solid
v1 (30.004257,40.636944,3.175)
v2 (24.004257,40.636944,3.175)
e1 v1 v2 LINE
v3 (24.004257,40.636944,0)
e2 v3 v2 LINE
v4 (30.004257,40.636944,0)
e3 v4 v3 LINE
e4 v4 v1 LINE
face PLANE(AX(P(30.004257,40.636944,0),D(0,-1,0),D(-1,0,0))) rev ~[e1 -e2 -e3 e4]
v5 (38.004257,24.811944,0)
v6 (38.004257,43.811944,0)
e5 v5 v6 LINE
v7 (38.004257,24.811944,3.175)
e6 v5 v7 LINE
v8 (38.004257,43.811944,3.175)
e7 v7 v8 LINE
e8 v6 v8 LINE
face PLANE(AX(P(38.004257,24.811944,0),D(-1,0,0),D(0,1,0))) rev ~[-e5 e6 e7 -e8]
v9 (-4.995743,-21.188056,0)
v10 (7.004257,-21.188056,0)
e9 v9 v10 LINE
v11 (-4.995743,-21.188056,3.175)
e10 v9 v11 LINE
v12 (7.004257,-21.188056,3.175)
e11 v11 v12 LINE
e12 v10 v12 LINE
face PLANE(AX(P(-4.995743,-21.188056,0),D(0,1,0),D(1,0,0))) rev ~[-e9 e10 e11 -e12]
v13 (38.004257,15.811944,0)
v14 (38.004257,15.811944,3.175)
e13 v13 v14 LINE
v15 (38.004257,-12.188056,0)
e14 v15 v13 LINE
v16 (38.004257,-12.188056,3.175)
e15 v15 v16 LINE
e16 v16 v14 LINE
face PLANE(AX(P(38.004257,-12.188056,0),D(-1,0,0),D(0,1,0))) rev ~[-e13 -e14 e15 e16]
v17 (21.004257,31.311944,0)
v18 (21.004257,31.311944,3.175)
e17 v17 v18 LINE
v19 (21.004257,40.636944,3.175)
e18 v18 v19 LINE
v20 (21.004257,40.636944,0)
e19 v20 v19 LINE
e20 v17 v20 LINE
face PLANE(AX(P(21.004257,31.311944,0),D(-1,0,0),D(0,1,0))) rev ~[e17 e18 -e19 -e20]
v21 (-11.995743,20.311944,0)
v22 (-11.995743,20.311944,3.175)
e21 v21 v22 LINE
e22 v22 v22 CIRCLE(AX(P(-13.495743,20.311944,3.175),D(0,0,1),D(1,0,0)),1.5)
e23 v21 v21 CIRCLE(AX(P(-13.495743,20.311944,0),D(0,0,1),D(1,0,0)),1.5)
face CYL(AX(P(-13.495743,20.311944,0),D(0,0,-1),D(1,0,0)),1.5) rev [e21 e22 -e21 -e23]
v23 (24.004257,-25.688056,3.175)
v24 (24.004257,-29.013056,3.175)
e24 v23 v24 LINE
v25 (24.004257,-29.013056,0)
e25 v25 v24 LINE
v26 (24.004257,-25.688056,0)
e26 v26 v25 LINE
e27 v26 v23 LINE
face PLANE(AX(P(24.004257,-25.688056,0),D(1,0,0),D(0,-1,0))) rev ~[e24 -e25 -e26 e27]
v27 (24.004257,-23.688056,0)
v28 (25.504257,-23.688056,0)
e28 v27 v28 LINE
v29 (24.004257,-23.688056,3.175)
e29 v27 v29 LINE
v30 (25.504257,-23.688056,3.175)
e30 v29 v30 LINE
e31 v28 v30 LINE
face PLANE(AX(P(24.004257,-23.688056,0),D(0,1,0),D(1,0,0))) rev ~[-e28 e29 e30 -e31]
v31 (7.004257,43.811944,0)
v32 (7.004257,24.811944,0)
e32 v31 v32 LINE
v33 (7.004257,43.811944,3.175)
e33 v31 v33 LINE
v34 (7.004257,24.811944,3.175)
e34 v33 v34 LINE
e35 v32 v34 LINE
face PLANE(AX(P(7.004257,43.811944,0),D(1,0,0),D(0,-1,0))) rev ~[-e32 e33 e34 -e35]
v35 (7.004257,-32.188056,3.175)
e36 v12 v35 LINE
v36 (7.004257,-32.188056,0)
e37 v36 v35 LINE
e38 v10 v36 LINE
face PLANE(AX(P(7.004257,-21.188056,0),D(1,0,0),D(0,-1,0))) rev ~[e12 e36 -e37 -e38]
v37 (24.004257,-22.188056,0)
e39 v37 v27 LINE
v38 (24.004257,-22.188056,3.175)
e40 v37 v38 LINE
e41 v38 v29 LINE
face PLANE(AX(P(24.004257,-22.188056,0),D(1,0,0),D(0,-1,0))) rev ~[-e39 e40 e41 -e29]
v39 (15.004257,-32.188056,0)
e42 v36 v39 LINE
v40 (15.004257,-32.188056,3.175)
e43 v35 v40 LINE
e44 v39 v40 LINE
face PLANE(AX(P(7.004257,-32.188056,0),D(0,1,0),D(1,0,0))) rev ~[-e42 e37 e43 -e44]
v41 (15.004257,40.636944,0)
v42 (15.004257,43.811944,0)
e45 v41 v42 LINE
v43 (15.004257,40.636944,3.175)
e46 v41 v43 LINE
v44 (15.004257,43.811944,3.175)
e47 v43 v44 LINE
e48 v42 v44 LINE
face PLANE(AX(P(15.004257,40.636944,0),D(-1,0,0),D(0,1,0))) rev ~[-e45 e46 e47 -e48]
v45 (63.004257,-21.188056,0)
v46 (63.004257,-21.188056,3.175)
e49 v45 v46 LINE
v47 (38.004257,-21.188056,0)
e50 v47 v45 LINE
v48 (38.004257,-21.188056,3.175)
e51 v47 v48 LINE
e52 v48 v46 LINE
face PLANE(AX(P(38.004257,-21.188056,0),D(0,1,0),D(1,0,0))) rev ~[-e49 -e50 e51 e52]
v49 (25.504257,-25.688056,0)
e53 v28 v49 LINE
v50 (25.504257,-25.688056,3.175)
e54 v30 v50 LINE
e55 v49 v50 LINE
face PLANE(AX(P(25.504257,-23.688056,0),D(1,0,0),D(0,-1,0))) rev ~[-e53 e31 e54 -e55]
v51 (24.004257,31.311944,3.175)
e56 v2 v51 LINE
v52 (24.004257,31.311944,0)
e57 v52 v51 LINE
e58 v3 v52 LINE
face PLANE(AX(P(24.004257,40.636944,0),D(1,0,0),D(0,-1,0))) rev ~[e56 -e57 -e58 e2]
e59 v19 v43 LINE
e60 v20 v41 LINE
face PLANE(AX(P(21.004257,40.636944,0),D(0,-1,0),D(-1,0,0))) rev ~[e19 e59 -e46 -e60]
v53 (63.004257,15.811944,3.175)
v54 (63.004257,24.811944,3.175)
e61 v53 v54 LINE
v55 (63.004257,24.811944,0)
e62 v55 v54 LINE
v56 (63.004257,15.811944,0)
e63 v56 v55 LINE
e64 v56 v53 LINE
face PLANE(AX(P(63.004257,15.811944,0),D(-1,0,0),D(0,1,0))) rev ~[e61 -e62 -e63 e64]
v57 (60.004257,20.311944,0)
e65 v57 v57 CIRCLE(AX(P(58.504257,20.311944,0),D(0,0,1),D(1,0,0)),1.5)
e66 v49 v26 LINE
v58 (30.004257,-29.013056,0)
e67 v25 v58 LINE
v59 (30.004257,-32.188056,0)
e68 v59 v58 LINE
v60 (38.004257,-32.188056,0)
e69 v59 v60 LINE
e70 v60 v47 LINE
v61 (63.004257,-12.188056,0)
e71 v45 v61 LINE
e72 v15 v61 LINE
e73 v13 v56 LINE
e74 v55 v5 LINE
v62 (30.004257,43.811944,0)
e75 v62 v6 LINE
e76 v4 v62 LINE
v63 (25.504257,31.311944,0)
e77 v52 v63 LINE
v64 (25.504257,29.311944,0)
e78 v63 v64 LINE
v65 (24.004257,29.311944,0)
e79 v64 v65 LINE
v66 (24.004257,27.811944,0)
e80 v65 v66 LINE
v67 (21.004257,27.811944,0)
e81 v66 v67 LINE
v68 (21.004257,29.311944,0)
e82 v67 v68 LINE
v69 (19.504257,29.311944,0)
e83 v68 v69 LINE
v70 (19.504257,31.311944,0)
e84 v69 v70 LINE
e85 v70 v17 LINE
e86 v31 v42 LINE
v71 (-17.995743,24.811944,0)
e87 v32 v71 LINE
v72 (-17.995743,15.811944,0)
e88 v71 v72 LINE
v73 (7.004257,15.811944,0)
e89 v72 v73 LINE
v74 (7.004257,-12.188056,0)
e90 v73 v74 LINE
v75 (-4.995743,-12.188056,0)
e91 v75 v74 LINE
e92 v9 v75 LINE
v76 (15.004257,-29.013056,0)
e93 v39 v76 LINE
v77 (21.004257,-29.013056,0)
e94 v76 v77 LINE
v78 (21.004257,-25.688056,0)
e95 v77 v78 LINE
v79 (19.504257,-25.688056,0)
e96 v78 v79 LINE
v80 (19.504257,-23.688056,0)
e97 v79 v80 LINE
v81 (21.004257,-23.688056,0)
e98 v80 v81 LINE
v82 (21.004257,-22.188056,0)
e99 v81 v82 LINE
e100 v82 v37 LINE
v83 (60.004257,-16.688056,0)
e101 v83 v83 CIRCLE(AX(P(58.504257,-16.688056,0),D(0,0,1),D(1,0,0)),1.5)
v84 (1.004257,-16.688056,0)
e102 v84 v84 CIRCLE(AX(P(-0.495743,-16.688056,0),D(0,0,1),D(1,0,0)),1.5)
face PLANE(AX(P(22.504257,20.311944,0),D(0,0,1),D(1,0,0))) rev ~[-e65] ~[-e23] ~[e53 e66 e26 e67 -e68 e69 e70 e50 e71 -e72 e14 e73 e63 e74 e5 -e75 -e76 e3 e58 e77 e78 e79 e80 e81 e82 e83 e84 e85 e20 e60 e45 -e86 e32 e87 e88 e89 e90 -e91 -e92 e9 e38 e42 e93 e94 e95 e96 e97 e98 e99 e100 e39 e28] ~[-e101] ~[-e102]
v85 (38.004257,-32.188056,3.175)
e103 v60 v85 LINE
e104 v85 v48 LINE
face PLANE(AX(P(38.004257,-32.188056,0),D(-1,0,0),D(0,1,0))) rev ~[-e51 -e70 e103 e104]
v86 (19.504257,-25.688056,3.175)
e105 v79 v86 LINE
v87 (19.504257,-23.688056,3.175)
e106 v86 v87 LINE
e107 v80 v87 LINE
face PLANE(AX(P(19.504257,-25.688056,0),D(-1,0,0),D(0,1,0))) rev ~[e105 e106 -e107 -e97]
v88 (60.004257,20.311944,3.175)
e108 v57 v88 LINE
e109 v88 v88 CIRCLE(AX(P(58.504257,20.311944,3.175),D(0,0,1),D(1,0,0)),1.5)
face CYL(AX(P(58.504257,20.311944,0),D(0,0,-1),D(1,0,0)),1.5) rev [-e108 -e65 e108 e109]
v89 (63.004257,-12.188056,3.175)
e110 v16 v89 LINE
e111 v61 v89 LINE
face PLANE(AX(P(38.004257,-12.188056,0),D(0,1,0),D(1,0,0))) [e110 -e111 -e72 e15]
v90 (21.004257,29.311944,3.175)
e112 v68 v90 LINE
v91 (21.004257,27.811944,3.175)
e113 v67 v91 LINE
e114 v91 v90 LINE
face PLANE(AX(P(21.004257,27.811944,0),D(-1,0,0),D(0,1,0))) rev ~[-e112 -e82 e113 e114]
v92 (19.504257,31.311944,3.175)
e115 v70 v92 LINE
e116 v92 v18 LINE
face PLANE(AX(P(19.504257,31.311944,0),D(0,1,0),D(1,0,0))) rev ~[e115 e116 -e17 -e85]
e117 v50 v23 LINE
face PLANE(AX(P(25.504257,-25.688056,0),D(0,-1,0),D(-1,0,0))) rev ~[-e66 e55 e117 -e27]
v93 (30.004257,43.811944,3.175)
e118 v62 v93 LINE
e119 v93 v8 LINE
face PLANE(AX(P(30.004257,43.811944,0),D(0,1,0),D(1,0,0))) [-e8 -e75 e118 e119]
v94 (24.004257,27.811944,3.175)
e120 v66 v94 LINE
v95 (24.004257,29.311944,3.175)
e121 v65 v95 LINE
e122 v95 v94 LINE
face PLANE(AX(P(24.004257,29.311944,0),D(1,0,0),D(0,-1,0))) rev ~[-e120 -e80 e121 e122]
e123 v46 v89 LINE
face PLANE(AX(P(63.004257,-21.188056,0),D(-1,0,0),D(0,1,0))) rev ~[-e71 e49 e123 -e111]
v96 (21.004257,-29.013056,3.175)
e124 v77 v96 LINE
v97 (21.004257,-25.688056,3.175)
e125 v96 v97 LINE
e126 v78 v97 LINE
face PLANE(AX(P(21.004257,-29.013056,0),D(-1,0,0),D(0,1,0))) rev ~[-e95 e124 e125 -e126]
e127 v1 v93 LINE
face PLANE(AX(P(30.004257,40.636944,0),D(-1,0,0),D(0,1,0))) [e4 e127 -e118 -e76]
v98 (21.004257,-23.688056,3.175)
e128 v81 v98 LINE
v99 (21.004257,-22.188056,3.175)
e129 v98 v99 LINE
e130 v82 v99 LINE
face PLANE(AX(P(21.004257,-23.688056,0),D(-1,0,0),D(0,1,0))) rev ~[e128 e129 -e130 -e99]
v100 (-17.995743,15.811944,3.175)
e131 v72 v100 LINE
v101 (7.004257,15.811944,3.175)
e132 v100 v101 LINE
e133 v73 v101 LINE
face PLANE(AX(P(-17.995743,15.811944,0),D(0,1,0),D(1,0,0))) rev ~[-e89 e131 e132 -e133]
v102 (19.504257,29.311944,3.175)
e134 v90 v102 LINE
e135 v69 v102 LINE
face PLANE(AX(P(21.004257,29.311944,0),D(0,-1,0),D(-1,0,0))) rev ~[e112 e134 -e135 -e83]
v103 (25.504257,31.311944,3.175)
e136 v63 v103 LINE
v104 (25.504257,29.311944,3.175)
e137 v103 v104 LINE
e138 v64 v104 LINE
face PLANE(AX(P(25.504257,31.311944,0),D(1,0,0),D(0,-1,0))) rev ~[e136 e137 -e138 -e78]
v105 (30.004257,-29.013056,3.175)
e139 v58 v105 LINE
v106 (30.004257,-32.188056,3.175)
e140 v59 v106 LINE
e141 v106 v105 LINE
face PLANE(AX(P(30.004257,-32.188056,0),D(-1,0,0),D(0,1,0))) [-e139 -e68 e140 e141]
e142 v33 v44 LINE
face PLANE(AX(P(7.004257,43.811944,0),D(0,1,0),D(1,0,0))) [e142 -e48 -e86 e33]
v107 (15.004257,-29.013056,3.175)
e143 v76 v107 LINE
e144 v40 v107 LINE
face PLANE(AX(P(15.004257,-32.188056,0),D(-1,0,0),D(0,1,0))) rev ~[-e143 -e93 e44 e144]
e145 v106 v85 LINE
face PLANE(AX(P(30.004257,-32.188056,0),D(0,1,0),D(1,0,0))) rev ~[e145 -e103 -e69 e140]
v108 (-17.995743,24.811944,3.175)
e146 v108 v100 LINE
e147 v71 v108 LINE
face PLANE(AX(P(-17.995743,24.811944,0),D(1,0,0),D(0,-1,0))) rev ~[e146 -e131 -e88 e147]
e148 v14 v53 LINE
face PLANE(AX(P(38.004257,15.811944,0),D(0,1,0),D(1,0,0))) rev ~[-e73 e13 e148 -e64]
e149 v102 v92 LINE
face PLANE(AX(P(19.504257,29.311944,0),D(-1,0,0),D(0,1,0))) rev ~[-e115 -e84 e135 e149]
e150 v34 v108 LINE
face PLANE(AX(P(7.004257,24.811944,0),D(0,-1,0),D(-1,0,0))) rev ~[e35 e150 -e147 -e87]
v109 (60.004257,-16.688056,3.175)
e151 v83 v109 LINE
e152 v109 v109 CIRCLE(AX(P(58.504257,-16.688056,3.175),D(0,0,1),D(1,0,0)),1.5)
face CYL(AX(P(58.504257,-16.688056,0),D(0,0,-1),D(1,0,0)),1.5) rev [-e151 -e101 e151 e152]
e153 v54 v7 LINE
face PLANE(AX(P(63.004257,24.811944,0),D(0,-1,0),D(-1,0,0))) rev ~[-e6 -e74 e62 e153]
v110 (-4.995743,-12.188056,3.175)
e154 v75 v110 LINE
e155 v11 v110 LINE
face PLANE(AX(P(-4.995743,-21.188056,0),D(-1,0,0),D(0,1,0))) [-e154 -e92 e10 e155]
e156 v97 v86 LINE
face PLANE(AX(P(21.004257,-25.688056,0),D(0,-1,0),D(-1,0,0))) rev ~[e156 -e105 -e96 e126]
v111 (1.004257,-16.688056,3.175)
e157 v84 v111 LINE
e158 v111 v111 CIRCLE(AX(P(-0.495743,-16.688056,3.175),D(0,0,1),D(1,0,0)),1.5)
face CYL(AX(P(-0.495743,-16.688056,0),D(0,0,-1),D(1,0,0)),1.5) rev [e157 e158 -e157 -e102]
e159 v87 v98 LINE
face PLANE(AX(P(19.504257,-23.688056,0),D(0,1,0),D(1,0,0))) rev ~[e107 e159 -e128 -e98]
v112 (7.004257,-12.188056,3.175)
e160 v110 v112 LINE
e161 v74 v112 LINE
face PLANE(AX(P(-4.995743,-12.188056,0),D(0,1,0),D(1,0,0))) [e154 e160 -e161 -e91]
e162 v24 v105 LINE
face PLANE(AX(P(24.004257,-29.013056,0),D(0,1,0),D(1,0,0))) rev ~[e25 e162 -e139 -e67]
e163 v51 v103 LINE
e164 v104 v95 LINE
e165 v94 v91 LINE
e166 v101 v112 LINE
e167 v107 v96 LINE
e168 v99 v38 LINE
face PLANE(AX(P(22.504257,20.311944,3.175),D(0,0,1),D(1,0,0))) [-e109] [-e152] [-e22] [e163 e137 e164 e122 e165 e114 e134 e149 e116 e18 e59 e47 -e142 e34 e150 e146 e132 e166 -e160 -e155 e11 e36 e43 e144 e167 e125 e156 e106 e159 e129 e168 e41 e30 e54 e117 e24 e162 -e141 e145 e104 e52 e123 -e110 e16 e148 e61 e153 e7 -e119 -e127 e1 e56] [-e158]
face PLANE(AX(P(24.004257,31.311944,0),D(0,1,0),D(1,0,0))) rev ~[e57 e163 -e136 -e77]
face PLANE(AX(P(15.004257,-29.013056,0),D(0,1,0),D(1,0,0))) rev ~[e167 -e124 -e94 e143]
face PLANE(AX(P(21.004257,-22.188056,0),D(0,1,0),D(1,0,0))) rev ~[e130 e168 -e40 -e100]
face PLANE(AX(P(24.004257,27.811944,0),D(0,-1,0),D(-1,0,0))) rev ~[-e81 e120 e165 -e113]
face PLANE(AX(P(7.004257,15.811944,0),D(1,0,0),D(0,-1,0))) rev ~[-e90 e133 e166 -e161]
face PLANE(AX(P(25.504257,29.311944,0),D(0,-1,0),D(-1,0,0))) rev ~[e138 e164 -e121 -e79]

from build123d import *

# Parameters (mm, degrees)
F0_R     = 1.5
F0_W     = 8
F0_H     = 3.175
F0_W_2   = 31
F0_H_2   = 9
F0_W_3   = 12
F0_W_4   = 25
F1_DEPTH = 3.175


# Not quite as in the source:
# - a length typed as a fraction of an inch, garbled in the dataset ("3 / 203.2 mm" for 3/8 in), is restored
# - a feature names something its author has since deleted; it is built from what else it names


with BuildPart() as f1:
    # F0 (on Top) → F1 (new body)
    with BuildSketch(Plane.XY):
        Polygon((7.0042573512, 24.8119444549), (-17.9957426488, 24.8119444549), (-17.9957426488, 15.8119444549), (7.0042573512, 15.8119444549), (22.5042573512, 15.8119444549), (38.0042573512, 15.8119444549), (63.0042573512, 15.8119444549), (63.0042573512, 24.8119444549), (38.0042573512, 24.8119444549), align=None)
        with Locations((-13.4957426488, 20.3119444549)):
            Circle(F0_R, mode=Mode.SUBTRACT)
        with Locations((58.5042573512, 20.3119444549)):
            Circle(F0_R, mode=Mode.SUBTRACT)
        Polygon((7.0042573512, 40.6369444549), (7.0042573512, 24.8119444549), (38.0042573512, 24.8119444549), (38.0042573512, 40.6369444549), (30.0042573512, 40.6369444549), (24.0042573512, 40.6369444549), (24.0042573512, 31.3119444549), (25.5042573512, 31.3119444549), (25.5042573512, 29.3119444549), (24.0042573512, 29.3119444549), (24.0042573512, 27.8119444549), (21.0042573512, 27.8119444549), (21.0042573512, 29.3119444549), (19.5042573512, 29.3119444549), (19.5042573512, 31.3119444549), (21.0042573512, 31.3119444549), (21.0042573512, 40.6369444549), (15.0042573512, 40.6369444549), align=None)
        with Locations((11.0042573512, 42.2244444549)):
            Rectangle(F0_W, F0_H)
        Polygon((22.5042573512, 15.8119444549), (7.0042573512, 15.8119444549), (7.0042573512, -12.1880555451), (38.0042573512, -12.1880555451), (38.0042573512, 15.8119444549), align=None)
        with Locations((34.0042573512, 42.2244444549)):
            Rectangle(F0_W, F0_H)
        with Locations((22.5042573512, -16.6880555451)):
            Rectangle(F0_W_2, F0_H_2)
        with Locations((1.0042573512, -16.6880555451)):
            Rectangle(F0_W_3, F0_H_2)
        with Locations((-0.4957426488, -16.6880555451)):
            Circle(F0_R, mode=Mode.SUBTRACT)
        Polygon((38.0042573512, -21.1880555451), (7.0042573512, -21.1880555451), (7.0042573512, -29.0130555451), (15.0042573512, -29.0130555451), (21.0042573512, -29.0130555451), (21.0042573512, -25.6880555451), (19.5042573512, -25.6880555451), (19.5042573512, -23.6880555451), (21.0042573512, -23.6880555451), (21.0042573512, -22.1880555451), (24.0042573512, -22.1880555451), (24.0042573512, -23.6880555451), (25.5042573512, -23.6880555451), (25.5042573512, -25.6880555451), (24.0042573512, -25.6880555451), (24.0042573512, -29.0130555451), (30.0042573512, -29.0130555451), (38.0042573512, -29.0130555451), align=None)
        with Locations((50.5042573512, -16.6880555451)):
            Rectangle(F0_W_4, F0_H_2)
        with Locations((58.5042573512, -16.6880555451)):
            Circle(F0_R, mode=Mode.SUBTRACT)
        with Locations((11.0042573512, -30.6005555451)):
            Rectangle(F0_W, F0_H)
        with Locations((34.0042573512, -30.6005555451)):
            Rectangle(F0_W, F0_H)
    extrude(amount=F1_DEPTH)


solid = f1.part
